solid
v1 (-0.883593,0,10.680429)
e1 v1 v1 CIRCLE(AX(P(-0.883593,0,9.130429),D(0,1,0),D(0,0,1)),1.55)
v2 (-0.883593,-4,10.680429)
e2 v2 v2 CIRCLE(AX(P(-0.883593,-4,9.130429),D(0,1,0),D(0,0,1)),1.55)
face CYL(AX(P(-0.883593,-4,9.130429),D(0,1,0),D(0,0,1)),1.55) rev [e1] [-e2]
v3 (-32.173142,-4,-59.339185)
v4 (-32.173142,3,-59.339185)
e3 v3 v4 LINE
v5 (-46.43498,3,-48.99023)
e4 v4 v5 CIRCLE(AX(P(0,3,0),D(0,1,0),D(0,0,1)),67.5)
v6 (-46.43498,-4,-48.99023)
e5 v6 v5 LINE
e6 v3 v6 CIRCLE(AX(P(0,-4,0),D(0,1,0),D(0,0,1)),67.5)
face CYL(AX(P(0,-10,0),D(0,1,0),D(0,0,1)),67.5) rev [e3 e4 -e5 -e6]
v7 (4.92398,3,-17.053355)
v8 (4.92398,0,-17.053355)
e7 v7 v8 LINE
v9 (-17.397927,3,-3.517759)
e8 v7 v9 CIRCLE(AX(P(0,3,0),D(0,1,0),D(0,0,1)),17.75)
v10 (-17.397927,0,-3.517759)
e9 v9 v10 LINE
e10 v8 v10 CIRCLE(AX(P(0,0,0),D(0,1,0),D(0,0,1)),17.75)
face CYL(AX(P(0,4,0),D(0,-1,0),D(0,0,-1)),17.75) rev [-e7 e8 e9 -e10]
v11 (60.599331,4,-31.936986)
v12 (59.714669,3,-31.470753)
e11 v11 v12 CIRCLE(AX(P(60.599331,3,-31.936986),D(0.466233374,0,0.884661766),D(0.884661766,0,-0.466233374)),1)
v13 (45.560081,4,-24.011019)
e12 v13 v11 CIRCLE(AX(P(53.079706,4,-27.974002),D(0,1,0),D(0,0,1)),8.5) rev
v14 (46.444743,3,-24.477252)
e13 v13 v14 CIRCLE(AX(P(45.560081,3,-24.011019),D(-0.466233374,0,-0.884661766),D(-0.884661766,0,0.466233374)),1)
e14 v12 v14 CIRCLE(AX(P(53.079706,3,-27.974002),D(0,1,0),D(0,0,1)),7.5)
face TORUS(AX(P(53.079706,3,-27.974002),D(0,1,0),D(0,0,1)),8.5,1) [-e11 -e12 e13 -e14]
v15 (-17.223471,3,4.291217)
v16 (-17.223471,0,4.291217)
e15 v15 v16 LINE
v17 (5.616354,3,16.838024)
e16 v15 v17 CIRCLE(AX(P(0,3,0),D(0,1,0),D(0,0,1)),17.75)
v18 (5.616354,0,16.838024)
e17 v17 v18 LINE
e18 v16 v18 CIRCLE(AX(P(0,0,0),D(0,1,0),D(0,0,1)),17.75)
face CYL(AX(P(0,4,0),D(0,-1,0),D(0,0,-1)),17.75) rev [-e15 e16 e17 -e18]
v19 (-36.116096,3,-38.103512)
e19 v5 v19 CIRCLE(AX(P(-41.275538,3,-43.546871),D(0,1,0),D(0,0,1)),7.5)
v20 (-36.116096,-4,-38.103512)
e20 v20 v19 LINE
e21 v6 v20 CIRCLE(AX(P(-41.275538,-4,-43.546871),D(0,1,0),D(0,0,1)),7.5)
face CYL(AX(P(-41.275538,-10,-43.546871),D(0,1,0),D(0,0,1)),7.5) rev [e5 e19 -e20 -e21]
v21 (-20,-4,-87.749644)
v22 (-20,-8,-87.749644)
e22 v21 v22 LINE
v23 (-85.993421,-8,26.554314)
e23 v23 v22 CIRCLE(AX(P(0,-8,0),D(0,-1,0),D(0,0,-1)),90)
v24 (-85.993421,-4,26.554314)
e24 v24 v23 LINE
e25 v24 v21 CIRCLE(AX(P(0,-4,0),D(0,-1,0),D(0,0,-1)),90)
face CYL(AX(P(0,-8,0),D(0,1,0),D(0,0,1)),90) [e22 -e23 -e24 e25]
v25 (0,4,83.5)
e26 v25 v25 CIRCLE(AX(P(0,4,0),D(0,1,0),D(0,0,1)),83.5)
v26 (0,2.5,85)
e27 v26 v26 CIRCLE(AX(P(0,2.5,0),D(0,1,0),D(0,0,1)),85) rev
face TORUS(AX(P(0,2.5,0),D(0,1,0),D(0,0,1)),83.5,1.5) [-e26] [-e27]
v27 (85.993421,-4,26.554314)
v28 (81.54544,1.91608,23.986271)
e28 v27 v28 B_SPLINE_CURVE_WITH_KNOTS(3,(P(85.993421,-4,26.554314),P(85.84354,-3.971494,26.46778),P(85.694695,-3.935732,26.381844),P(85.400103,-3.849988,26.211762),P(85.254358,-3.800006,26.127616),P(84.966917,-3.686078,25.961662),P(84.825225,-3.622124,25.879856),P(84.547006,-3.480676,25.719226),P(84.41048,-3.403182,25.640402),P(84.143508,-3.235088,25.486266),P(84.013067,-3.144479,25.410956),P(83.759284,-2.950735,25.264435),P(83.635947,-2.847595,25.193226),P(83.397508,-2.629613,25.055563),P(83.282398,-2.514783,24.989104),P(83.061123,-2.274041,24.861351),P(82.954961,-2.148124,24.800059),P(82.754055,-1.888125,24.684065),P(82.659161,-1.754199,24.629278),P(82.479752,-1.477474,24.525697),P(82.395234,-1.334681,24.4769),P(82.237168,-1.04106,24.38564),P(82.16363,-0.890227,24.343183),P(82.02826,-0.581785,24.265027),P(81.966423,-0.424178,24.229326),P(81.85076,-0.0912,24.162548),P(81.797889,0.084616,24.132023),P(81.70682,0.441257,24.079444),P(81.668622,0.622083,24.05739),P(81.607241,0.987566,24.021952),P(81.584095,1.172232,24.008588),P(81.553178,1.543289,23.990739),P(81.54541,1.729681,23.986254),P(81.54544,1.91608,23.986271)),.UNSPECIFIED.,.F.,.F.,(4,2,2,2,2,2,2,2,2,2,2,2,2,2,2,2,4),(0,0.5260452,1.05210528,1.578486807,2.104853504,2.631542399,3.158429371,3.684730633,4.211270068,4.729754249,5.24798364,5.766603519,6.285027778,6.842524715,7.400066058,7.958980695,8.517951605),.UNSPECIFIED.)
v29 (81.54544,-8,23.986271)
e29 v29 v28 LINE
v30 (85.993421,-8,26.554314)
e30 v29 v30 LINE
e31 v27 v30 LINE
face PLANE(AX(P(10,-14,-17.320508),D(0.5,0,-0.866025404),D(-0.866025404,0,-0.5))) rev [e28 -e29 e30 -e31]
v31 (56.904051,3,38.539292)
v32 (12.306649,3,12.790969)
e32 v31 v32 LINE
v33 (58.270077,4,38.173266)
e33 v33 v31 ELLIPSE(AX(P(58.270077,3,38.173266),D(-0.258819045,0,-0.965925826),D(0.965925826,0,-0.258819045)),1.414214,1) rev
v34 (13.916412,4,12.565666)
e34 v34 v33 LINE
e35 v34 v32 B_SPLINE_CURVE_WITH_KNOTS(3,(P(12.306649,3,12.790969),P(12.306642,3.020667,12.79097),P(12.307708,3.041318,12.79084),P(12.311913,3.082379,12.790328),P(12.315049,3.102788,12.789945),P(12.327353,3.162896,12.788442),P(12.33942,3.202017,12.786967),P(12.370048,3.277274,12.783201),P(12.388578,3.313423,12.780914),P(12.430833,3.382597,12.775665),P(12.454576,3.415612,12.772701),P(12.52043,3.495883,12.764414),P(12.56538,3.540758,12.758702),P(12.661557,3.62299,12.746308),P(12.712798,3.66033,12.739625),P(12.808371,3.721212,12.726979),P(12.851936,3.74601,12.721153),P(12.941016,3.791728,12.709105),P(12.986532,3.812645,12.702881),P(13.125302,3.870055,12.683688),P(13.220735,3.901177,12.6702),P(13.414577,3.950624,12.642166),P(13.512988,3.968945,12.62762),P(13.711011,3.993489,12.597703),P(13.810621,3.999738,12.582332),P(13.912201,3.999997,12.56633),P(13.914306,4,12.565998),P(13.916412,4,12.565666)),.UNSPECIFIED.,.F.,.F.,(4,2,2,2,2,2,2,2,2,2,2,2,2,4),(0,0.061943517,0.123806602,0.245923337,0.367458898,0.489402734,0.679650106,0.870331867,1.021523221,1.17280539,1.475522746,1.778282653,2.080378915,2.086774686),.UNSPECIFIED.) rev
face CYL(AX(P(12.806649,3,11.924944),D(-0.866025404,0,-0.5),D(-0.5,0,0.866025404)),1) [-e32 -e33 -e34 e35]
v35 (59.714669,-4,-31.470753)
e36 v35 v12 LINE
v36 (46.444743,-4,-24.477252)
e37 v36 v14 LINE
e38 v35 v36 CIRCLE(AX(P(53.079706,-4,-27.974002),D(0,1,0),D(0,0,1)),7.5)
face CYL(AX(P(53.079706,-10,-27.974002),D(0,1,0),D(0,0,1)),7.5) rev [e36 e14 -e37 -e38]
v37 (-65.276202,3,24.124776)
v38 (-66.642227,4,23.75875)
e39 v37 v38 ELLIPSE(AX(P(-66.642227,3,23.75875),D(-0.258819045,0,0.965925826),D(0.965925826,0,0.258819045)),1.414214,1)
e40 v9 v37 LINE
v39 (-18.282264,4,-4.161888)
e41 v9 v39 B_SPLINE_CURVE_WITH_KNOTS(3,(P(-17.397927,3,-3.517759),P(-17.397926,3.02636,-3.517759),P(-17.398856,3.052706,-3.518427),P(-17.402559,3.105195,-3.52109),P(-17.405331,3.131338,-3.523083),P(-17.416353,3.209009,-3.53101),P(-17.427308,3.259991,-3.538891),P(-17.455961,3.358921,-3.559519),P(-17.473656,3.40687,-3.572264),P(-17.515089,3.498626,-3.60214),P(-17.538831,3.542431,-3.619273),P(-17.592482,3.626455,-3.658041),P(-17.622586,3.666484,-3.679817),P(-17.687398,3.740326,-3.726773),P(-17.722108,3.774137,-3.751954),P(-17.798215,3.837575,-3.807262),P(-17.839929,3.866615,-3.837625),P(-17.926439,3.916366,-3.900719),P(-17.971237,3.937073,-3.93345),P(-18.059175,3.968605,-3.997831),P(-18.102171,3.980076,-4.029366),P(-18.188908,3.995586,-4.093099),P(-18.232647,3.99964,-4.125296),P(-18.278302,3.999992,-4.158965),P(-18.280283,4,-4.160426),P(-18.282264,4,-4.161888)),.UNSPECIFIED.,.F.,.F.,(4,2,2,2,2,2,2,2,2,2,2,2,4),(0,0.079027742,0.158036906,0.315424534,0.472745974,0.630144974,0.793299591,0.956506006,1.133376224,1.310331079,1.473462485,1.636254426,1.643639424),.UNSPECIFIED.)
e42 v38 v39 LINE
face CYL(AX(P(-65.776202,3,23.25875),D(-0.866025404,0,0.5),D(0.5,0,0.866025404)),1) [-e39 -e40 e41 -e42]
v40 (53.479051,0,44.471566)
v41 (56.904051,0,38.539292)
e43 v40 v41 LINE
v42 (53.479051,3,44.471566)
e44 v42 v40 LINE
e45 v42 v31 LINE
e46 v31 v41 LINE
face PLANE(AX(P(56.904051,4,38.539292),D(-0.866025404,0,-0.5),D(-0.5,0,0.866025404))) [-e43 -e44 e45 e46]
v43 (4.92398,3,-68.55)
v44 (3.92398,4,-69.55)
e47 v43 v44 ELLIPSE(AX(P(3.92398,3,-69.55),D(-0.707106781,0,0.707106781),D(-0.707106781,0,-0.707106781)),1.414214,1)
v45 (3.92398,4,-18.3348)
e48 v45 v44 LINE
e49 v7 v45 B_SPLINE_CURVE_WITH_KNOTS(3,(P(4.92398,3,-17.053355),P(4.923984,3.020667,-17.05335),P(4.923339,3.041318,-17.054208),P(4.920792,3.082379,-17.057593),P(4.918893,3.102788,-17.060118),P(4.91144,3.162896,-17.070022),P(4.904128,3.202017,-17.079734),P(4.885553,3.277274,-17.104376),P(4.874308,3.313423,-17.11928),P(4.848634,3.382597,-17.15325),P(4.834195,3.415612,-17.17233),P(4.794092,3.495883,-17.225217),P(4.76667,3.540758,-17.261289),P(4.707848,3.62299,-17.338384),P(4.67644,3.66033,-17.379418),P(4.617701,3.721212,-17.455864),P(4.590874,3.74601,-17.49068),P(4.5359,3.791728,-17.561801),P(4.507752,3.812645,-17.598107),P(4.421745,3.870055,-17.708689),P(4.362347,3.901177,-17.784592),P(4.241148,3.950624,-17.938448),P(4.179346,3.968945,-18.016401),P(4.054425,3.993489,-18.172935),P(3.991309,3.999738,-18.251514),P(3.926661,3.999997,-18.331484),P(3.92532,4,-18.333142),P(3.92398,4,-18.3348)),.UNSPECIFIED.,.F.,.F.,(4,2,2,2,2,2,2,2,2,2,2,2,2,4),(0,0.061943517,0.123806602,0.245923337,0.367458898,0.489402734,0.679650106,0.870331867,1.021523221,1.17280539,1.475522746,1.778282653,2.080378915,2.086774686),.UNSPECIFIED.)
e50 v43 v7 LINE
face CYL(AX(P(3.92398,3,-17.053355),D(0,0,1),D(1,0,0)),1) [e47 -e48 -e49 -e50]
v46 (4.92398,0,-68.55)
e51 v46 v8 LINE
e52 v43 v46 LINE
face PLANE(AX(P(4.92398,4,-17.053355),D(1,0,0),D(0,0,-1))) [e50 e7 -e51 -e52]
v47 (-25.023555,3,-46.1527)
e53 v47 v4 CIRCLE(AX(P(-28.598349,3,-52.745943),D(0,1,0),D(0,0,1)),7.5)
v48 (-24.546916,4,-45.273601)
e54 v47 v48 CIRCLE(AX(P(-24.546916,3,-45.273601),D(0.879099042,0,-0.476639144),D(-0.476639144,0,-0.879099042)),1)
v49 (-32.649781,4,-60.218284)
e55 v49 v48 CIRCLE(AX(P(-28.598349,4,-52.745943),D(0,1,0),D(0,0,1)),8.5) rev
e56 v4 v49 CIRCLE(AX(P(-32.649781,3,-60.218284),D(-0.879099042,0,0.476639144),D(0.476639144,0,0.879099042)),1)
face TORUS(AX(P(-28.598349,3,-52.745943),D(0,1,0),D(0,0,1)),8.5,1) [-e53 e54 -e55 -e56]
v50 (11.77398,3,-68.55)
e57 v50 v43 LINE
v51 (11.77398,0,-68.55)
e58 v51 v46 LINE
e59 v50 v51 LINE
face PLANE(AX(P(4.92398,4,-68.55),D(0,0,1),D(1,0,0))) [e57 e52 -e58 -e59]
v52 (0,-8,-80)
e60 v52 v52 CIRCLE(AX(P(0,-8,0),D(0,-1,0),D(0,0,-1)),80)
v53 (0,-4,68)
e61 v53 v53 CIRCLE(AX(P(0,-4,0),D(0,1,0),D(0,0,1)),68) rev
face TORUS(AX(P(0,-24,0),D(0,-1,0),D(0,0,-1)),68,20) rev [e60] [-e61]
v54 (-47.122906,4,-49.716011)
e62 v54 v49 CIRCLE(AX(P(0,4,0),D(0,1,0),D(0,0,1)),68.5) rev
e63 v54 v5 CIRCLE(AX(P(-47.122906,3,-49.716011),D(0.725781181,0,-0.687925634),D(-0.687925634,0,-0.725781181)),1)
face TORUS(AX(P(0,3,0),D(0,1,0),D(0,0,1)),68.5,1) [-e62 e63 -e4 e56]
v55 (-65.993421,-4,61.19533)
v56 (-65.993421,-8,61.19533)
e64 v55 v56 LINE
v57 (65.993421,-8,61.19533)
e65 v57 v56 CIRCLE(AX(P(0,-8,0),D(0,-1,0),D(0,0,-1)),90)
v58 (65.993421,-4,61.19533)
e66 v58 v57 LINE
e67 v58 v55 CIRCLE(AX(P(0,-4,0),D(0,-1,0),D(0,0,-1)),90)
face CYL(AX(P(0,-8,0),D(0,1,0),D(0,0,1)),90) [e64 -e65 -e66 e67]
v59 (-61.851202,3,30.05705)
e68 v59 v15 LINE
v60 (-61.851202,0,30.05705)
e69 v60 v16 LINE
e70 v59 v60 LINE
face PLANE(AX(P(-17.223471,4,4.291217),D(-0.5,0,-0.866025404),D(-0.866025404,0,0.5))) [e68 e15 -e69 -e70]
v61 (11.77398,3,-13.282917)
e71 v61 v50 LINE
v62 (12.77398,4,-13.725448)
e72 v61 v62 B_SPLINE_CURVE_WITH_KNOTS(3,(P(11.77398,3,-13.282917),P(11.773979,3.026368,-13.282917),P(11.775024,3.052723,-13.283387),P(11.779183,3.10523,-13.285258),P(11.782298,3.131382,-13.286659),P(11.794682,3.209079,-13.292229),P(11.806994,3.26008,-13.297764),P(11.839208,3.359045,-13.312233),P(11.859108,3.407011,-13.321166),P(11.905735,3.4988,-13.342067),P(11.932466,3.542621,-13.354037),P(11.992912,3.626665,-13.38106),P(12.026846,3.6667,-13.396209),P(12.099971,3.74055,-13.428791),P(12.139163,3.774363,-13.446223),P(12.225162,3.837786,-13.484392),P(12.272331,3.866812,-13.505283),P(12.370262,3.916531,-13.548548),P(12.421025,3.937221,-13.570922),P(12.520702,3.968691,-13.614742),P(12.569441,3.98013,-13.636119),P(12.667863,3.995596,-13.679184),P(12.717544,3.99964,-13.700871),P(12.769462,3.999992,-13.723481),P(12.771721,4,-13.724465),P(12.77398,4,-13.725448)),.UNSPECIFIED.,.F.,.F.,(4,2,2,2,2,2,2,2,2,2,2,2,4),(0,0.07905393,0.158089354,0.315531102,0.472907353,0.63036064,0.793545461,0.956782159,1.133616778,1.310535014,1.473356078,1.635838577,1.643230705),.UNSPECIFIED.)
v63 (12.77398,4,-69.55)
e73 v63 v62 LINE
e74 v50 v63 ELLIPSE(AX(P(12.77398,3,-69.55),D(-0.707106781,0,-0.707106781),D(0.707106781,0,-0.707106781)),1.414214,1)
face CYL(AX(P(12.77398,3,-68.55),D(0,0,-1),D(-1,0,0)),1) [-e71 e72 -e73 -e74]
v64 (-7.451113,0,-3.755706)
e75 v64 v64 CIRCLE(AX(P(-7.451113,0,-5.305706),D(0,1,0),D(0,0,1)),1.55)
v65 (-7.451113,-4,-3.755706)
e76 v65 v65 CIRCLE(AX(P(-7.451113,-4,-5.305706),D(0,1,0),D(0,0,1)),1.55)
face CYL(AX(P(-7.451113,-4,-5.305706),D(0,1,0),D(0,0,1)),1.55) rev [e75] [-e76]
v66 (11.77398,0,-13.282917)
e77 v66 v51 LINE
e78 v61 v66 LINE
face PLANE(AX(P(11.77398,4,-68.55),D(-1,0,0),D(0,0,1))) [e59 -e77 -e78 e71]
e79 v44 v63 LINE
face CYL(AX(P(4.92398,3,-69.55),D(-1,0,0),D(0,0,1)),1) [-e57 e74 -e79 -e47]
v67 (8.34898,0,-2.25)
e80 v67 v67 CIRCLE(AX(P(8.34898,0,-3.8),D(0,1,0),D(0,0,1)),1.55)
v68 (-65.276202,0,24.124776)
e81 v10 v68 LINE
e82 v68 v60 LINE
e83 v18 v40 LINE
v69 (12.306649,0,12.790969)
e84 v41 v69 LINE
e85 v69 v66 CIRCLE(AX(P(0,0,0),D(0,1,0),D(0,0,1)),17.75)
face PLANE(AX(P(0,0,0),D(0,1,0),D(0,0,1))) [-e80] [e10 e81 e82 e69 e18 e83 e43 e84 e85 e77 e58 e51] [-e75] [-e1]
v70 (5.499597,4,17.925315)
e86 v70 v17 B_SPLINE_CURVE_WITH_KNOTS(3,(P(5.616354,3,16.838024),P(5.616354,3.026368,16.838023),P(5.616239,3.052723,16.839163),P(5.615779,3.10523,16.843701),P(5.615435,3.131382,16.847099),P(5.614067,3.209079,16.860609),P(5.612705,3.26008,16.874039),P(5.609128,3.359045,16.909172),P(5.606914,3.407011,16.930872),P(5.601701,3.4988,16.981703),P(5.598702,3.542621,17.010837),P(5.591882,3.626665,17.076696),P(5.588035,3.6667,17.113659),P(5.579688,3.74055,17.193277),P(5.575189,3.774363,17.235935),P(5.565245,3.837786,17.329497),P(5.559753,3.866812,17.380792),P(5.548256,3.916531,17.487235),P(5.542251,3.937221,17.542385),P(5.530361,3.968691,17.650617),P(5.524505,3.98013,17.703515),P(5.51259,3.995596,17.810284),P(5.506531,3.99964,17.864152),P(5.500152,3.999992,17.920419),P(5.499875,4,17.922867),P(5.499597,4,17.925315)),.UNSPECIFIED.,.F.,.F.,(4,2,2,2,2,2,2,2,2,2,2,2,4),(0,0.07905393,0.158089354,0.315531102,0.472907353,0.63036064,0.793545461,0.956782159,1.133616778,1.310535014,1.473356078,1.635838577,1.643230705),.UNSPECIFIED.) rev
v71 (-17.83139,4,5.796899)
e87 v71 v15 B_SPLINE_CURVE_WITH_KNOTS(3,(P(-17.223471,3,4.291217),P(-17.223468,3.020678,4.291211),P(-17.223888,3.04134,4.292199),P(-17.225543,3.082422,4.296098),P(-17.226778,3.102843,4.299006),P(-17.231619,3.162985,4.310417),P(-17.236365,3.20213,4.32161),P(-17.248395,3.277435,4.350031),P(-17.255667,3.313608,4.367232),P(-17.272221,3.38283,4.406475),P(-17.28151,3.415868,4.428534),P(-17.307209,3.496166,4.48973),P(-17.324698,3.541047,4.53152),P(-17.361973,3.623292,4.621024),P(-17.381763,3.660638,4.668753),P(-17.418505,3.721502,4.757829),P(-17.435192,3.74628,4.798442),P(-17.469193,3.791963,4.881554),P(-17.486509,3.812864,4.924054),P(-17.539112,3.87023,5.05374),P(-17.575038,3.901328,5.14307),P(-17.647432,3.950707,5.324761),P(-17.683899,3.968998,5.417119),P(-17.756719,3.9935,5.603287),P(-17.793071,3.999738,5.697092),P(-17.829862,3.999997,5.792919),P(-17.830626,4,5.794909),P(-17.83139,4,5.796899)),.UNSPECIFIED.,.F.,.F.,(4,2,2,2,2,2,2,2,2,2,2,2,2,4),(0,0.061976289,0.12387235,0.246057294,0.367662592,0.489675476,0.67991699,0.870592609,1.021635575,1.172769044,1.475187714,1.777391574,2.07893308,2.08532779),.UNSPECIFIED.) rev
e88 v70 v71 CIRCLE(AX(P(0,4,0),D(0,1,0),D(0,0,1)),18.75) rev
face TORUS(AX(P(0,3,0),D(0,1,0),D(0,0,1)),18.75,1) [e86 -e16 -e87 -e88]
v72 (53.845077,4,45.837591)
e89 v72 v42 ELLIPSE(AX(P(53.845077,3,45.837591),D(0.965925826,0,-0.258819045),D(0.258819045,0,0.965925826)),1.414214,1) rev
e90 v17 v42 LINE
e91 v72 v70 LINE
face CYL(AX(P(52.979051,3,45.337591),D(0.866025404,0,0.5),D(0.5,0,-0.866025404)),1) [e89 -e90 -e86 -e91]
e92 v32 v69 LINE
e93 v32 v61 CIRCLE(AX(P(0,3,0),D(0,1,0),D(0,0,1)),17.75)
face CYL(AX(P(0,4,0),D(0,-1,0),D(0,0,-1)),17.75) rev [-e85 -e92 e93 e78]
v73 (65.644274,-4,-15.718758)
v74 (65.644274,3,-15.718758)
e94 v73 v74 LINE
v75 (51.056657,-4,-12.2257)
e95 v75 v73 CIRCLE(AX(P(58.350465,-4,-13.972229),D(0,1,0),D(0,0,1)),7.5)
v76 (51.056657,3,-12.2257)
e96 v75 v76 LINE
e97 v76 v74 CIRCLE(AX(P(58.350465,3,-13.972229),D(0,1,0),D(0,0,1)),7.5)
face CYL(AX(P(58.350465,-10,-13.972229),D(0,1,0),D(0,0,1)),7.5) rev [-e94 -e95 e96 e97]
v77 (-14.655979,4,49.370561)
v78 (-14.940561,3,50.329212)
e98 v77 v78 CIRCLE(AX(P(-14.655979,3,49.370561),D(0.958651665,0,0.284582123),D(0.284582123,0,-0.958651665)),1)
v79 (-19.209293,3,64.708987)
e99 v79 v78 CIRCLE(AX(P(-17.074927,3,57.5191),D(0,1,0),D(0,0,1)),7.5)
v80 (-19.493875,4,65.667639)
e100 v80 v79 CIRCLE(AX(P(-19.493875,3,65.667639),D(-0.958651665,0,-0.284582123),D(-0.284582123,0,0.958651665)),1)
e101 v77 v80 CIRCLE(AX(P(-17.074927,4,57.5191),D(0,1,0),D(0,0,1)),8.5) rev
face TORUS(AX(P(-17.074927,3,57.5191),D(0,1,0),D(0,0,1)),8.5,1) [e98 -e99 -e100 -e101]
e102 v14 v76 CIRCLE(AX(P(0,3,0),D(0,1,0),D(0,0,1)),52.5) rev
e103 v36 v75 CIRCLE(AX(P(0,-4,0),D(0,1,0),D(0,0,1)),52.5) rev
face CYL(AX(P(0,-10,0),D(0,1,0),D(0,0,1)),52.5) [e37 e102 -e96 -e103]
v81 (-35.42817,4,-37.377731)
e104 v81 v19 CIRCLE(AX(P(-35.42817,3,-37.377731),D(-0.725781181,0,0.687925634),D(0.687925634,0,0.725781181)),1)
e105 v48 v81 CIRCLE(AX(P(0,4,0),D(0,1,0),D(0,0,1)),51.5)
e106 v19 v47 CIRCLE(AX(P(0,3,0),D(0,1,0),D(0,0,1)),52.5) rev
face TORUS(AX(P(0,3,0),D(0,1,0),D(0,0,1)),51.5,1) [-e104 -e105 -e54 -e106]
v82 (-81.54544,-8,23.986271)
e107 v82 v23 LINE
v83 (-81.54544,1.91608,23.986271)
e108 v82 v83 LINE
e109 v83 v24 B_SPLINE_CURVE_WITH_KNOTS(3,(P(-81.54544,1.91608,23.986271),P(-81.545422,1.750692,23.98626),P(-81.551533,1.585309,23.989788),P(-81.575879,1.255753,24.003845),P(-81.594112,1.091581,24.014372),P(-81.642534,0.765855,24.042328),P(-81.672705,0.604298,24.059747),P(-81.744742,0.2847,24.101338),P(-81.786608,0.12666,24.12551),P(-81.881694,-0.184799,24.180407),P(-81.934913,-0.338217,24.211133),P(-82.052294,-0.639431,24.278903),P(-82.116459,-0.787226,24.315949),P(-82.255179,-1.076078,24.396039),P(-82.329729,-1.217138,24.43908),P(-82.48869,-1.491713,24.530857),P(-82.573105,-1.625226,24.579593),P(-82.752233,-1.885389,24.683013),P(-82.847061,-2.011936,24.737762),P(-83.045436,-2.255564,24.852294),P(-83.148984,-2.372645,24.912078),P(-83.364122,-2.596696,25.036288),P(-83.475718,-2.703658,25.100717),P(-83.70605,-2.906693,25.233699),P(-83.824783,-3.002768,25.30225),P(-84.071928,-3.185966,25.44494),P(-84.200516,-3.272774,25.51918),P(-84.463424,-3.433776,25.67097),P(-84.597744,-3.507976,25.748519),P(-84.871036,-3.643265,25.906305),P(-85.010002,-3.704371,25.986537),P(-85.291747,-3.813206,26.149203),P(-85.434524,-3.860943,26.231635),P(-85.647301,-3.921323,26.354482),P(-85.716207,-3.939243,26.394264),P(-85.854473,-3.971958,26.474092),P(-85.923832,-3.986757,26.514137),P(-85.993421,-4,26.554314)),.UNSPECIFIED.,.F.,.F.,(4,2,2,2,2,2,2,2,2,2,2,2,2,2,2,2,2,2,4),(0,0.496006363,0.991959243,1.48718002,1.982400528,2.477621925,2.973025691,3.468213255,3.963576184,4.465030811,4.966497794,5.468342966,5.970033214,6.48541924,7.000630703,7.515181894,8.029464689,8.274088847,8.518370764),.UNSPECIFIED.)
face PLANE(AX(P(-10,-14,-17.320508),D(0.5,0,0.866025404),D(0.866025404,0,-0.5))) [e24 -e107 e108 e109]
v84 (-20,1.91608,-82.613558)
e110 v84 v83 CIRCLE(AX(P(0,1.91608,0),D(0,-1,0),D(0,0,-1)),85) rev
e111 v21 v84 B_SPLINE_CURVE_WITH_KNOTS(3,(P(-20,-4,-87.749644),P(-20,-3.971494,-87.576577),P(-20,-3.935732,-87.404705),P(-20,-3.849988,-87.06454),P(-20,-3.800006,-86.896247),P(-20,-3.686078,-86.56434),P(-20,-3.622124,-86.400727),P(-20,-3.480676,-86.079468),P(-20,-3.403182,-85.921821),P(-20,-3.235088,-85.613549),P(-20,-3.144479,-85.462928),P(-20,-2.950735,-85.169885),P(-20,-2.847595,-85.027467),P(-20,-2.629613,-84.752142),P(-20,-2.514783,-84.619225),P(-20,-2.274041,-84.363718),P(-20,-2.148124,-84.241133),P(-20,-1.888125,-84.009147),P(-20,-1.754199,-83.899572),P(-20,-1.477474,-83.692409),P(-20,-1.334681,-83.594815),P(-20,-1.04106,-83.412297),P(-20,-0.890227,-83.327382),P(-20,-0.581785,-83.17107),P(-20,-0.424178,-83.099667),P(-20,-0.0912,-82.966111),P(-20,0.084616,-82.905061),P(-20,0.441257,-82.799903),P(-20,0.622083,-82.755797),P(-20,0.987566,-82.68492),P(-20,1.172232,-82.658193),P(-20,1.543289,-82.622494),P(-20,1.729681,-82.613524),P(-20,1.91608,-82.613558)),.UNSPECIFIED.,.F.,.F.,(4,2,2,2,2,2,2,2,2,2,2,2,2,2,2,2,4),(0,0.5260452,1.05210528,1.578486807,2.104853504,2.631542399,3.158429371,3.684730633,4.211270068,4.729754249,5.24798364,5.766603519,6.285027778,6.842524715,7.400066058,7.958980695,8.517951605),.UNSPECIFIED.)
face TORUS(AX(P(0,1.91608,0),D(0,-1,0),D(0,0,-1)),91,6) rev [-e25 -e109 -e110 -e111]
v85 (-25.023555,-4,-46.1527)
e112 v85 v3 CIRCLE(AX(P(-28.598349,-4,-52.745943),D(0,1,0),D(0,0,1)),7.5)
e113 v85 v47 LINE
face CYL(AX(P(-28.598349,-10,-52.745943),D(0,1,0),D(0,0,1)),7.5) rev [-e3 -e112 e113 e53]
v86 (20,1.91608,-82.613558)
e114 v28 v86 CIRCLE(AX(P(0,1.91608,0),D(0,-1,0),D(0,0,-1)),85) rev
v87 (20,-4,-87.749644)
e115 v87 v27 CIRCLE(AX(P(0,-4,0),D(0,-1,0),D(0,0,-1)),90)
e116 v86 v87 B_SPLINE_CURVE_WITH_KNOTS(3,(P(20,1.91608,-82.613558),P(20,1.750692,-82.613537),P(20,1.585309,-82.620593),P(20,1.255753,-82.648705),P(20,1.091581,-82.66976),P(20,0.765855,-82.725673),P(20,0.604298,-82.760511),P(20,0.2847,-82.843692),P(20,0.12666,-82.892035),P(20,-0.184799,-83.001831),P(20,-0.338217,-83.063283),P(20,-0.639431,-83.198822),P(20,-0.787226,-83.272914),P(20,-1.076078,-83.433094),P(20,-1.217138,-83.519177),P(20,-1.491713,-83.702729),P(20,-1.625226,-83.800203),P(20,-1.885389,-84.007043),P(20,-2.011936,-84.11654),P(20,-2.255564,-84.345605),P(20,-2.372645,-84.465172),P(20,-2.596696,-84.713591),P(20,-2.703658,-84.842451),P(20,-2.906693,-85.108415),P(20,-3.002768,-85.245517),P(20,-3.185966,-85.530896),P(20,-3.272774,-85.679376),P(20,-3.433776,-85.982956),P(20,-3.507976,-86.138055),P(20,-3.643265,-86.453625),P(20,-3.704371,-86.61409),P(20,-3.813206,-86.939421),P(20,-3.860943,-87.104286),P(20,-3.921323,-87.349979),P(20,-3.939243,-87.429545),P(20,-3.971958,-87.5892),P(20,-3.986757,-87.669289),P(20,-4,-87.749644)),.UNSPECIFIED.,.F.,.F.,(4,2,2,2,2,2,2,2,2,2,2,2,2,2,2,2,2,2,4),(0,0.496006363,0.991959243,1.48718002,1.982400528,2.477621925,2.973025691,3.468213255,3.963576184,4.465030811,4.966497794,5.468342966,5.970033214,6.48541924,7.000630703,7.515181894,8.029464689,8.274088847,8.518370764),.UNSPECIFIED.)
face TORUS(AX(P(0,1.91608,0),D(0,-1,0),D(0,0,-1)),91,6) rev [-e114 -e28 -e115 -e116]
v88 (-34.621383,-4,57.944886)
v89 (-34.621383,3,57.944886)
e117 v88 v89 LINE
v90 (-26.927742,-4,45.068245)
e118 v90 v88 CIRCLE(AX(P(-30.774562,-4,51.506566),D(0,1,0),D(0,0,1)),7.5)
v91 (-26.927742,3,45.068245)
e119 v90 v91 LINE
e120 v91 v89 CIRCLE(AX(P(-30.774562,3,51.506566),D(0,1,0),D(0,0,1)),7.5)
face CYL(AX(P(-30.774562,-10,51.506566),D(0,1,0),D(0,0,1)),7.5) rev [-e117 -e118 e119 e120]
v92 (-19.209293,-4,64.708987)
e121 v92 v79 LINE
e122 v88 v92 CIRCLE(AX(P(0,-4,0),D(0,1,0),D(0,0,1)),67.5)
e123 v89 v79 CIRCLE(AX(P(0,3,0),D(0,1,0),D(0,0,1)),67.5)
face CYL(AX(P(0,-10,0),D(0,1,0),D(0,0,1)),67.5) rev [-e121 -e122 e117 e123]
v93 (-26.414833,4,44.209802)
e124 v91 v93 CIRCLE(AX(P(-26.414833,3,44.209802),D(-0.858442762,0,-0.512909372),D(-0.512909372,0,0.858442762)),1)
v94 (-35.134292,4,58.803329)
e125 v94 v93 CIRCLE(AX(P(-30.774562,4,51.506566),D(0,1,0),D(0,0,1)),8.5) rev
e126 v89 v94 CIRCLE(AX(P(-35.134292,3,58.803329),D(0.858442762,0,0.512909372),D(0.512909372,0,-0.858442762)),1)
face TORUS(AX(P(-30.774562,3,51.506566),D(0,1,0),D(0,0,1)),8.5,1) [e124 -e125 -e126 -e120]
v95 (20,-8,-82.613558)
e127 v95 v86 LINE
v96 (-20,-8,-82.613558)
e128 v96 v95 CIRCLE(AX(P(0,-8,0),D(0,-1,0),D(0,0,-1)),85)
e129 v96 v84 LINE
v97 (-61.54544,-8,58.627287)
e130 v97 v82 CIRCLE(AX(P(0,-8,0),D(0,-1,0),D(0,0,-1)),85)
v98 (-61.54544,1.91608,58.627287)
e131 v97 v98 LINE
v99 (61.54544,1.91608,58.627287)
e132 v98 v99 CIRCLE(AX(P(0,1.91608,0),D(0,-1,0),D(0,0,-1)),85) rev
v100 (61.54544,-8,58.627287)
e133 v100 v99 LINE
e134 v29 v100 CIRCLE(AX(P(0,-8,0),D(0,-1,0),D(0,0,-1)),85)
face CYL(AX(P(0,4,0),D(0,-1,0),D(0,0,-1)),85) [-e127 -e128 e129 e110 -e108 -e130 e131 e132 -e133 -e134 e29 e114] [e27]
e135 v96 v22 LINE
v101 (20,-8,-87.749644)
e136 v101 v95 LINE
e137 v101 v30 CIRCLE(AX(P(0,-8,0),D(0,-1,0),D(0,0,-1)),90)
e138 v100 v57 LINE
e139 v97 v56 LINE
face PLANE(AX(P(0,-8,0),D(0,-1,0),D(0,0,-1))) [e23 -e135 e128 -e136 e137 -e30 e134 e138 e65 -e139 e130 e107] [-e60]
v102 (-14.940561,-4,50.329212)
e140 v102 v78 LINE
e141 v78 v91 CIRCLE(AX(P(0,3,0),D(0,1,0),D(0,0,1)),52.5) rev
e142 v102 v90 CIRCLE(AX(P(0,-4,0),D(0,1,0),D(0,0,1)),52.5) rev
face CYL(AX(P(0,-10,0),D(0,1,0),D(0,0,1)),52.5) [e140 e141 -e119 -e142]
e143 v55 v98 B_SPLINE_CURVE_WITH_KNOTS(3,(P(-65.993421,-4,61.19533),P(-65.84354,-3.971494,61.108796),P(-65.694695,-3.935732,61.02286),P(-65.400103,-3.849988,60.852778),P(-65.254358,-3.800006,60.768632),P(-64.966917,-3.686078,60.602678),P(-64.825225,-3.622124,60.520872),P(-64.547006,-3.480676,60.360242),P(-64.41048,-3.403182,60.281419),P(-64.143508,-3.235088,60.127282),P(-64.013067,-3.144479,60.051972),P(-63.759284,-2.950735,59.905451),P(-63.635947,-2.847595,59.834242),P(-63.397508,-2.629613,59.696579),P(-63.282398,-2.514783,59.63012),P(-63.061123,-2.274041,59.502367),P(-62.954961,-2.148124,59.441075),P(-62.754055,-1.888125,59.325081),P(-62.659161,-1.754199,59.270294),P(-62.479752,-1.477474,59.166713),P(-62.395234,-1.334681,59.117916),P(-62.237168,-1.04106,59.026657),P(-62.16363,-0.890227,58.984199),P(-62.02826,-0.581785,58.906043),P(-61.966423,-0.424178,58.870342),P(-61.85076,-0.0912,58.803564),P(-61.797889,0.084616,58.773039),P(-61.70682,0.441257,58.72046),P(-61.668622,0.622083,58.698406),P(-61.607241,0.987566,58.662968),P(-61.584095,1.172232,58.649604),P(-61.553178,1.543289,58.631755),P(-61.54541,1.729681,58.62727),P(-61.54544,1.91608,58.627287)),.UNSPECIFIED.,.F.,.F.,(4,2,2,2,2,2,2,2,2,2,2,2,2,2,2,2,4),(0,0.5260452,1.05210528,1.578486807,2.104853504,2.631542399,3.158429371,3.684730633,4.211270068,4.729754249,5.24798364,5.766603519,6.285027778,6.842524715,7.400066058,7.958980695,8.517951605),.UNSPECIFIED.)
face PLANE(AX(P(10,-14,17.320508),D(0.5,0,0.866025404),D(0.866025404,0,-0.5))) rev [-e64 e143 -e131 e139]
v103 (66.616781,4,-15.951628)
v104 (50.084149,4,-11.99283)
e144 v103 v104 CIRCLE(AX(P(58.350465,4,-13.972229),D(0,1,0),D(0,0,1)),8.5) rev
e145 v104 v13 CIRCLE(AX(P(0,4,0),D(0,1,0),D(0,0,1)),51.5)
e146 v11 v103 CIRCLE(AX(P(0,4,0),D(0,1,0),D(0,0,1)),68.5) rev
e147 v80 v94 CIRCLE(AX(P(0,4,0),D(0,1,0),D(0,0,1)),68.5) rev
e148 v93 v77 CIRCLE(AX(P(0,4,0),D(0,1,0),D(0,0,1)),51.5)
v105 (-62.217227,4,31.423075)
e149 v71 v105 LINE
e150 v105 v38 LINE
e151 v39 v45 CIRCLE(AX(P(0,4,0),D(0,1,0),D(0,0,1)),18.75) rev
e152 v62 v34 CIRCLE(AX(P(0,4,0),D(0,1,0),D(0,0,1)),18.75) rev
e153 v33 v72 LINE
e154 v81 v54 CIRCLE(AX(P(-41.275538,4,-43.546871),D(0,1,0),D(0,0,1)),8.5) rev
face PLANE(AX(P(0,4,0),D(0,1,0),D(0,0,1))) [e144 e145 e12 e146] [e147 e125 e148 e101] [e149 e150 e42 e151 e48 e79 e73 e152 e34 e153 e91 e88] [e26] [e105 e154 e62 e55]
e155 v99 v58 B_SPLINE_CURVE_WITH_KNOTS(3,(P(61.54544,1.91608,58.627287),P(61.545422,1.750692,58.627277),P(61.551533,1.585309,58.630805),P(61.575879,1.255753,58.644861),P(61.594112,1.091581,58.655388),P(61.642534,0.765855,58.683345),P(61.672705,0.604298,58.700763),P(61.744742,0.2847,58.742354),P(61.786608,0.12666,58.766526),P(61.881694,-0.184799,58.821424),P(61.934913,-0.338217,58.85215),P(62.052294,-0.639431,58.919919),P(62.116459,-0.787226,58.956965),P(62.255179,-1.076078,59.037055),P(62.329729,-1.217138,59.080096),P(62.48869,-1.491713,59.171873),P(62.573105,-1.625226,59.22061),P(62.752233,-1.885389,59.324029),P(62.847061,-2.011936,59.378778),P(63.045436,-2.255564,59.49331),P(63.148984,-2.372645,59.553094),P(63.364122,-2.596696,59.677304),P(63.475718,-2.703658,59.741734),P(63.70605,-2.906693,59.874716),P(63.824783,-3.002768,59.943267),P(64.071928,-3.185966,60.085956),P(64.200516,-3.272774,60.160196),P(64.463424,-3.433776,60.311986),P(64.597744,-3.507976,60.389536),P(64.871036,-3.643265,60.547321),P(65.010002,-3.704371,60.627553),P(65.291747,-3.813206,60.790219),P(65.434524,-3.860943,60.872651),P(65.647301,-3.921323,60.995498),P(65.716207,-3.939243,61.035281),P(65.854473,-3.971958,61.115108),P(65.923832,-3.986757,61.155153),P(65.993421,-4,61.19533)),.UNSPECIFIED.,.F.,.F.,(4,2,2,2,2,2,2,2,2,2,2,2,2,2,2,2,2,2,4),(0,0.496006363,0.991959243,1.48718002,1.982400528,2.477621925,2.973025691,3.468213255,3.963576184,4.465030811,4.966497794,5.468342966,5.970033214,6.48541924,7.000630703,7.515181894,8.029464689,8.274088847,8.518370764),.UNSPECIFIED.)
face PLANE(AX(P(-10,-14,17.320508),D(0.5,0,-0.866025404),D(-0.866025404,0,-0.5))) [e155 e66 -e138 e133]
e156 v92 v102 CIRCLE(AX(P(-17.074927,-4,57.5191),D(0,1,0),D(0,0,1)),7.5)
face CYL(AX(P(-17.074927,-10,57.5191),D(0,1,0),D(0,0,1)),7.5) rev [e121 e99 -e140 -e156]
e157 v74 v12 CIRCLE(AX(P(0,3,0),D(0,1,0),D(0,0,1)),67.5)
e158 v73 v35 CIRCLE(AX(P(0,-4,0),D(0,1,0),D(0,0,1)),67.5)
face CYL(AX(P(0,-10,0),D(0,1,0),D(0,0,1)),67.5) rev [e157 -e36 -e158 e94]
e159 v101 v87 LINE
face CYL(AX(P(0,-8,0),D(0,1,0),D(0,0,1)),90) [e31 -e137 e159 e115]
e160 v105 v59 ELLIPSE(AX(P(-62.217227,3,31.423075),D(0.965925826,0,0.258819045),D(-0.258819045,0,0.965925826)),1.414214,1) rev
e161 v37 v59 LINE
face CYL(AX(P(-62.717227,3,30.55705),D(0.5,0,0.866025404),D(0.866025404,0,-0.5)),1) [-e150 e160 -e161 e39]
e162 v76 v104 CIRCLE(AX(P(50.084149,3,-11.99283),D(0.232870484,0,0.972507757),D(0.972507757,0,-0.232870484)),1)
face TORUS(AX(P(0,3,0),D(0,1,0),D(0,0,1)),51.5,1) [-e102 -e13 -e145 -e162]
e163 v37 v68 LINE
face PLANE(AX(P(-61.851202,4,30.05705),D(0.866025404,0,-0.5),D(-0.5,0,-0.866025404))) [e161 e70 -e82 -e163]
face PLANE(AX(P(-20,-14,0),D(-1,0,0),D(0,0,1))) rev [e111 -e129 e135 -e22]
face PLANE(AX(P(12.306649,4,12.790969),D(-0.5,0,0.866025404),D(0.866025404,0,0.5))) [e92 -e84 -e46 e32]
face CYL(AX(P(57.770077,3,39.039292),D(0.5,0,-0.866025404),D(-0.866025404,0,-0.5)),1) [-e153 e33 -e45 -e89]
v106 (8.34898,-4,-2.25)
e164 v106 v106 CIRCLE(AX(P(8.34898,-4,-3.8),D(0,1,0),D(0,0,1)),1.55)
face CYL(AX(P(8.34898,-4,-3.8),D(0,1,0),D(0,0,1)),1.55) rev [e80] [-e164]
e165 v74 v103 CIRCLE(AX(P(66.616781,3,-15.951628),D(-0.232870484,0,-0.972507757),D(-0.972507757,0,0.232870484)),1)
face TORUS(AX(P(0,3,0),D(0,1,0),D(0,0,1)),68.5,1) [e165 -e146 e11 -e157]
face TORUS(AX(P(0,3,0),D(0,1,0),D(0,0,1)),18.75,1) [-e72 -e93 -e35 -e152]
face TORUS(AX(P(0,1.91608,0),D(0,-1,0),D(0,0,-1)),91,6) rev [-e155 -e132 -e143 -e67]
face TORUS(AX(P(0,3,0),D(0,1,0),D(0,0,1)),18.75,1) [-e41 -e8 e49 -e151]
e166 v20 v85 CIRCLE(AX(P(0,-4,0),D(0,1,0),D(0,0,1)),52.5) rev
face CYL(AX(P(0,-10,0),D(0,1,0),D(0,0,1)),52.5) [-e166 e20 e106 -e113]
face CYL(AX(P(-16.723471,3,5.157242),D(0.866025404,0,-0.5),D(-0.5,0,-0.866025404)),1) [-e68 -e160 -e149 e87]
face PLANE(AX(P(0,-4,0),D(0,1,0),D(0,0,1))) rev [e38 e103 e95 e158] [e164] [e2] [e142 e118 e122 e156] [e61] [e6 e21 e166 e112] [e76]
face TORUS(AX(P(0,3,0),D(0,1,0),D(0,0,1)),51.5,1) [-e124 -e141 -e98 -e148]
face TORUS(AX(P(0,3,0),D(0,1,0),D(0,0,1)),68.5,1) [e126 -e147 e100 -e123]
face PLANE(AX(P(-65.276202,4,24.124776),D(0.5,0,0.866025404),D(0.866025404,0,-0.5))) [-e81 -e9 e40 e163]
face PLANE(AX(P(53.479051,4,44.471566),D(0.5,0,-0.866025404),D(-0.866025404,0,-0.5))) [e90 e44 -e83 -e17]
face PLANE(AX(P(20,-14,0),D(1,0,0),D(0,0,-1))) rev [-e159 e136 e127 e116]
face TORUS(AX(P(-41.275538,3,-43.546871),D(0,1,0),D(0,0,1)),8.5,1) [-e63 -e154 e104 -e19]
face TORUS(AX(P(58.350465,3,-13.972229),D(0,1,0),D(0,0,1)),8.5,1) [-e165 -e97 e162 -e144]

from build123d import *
from build123d.topology import SkipClean

# Parameters (mm, degrees)
CROQUIS2_R              = 85
SALIENTE_EXTRUIR1_DEPTH = 4
SALIENTE_EXTRUIR2_START = -4
CROQUIS3_R              = 85
SALIENTE_EXTRUIR2_DEPTH = 4
CROQUIS4_R              = 1.55
CORTAR_EXTRUIR2_DEPTH   = 4
CROQUIS5_R              = 90
CROQUIS5_R_2            = 80
SALIENTE_EXTRUIR3_DEPTH = 4
REDONDEO1_R             = 20
CORTAR_EXTRUIR3_DEPTH   = 14
CORTAR_EXTRUIR4_DEPTH   = 14
REDONDEO2_R             = 6
REDONDEO3_R             = 1.5
REDONDEO5_R             = 1


with BuildPart() as part:
    # Croquis2 → Saliente-Extruir1 (new body)
    with BuildSketch(Plane(origin=(0, 0, 0), x_dir=(1, 0, 0), z_dir=(0, 1, 0))):
        with Locations(Location((0, 0, 0), (0, 0, 270))):
            Circle(CROQUIS2_R)
        with BuildLine():
            Line((-65.276202, -24.124776), (-17.397927, 3.517759))
            ThreePointArc((-17.397927, 3.517759), (-9.203419, 15.177601), (4.92398, 17.053355))
            Line((4.92398, 17.053355), (4.92398, 68.55))
            Line((4.92398, 68.55), (11.77398, 68.55))
            Line((11.77398, 68.55), (11.77398, 13.282917))
            ThreePointArc((11.77398, 13.282917), (17.746297, 0.362543), (12.306649, -12.790969))
            Line((12.306649, -12.790969), (56.904051, -38.539292))
            Line((56.904051, -38.539292), (53.479051, -44.471566))
            Line((53.479051, -44.471566), (5.616354, -16.838024))
            ThreePointArc((5.616354, -16.838024), (-8.546162, -15.557172), (-17.223471, -4.291217))
            Line((-17.223471, -4.291217), (-61.851202, -30.05705))
            Line((-61.851202, -30.05705), (-65.276202, -24.124776))
        make_face(mode=Mode.SUBTRACT)
    extrude(amount=SALIENTE_EXTRUIR1_DEPTH)

    # Croquis3 → Saliente-Extruir2 (add)
    with BuildSketch(Plane(origin=(0, 0, 0), x_dir=(1, 0, 0), z_dir=(0, 1, 0)).offset(SALIENTE_EXTRUIR2_START)):
        with Locations(Location((0, 0, 0), (0, 0, 270))):
            Circle(CROQUIS3_R)
    extrude(amount=SALIENTE_EXTRUIR2_DEPTH)

    # Croquis4 → Cortar-Extruir2 (cut)
    with BuildSketch(Plane(origin=(0, 0, 0), x_dir=(1, 0, 0), z_dir=(0, 1, 0))):
        with Locations(Location((-7.451113, 5.305706, 0), (0, 0, 270))):
            Circle(CROQUIS4_R)
        with Locations(Location((8.34898, 3.8, 0), (0, 0, 270))):
            Circle(CROQUIS4_R)
        with Locations(Location((-0.883593, -9.130429, 0), (0, 0, 270))):
            Circle(CROQUIS4_R)
    extrude(amount=-CORTAR_EXTRUIR2_DEPTH, mode=Mode.SUBTRACT)

    # Croquis5 → Saliente-Extruir3 (add)
    with BuildSketch(Plane.XZ.offset(4)):
        with Locations(Location((0, 0, 0), (0, 0, 270))):
            Circle(CROQUIS5_R)
        with Locations(Location((0, 0, 0), (0, 0, 270))):
            Circle(CROQUIS5_R_2, mode=Mode.SUBTRACT)
    extrude(amount=SALIENTE_EXTRUIR3_DEPTH)

    # Redondeo1
    # the kernel refuses this fillet: 20 mm, written as the material it adds along each edge
    with BuildSketch(Plane(origin=(0, -4, 0), x_dir=(0, 0, -1), z_dir=(-1, 0, 0))) as redondeo1_piece_1:
        with BuildLine():
            CenterArc((68, 20), REDONDEO1_R, 270, 36.869898)
            Line((68, 0), (68, -0.4))
            Line((68, -0.4), (80, -0.4))
            Line((80, -0.4), (80.4, 0))
            ThreePointArc((80.4, 0), (80.4, 2), (80.24, 3.68))
            Line((80.24, 3.68), (80, 4))
        make_face()
    revolve(axis=Axis((0, -4, 0), (0, -1, 0)))

    # Croquis6 → Cortar-Extruir3 (cut)
    with BuildSketch(Plane(origin=(0, 4, 0), x_dir=(1, 0, 0), z_dir=(0, 1, 0))):
        with BuildLine():
            ThreePointArc((65.644274, 15.718758), (63.172363, 23.780297), (59.714669, 31.470753))
            ThreePointArc((59.714669, 31.470753), (49.582956, 34.608966), (46.444743, 24.477252))
            ThreePointArc((46.444743, 24.477252), (49.13406, 18.495787), (51.056657, 12.2257))
            ThreePointArc((51.056657, 12.2257), (60.096994, 6.678421), (65.644274, 15.718758))
        make_face()
        with BuildLine():
            ThreePointArc((-34.621383, -57.944886), (-27.126992, -61.809193), (-19.209293, -64.708987))
            ThreePointArc((-19.209293, -64.708987), (-9.88504, -59.653466), (-14.940561, -50.329212))
            ThreePointArc((-14.940561, -50.329212), (-21.098771, -48.073817), (-26.927742, -45.068245))
            ThreePointArc((-26.927742, -45.068245), (-37.212883, -47.659745), (-34.621383, -57.944886))
        make_face()
        with BuildLine():
            ThreePointArc((-32.173142, 59.339185), (-39.643214, 54.632093), (-46.43498, 48.99023))
            ThreePointArc((-46.43498, 48.99023), (-46.718897, 38.387429), (-36.116096, 38.103512))
            ThreePointArc((-36.116096, 38.103512), (-30.833611, 42.491628), (-25.023555, 46.1527))
            ThreePointArc((-25.023555, 46.1527), (-22.005106, 56.320736), (-32.173142, 59.339185))
        make_face()
    extrude(amount=-CORTAR_EXTRUIR3_DEPTH, mode=Mode.SUBTRACT)

    # Croquis7 → Cortar-Extruir4 (cut)
    with SkipClean():  # the faces are left unmerged after this step: merging them gives an invalid solid
        with BuildSketch(Plane(origin=(0, 0, 0), x_dir=(1, 0, 0), z_dir=(0, 1, 0))):
            with BuildLine():
                ThreePointArc((20, 87.749644), (0, 90), (-20, 87.749644))
                Line((-20, 87.749644), (-20, 82.613558))
                ThreePointArc((-20, 82.613558), (0, 85), (20, 82.613558))
                Line((20, 82.613558), (20, 87.749644))
            make_face()
            with BuildLine():
                Line((-81.54544, -23.986271), (-85.993421, -26.554314))
                ThreePointArc((-85.993421, -26.554314), (-77.942286, -45), (-65.993421, -61.19533))
                Line((-65.993421, -61.19533), (-61.54544, -58.627287))
                ThreePointArc((-61.54544, -58.627287), (-73.612159, -42.5), (-81.54544, -23.986271))
            make_face()
            with BuildLine():
                Line((61.54544, -58.627287), (65.993421, -61.19533))
                ThreePointArc((65.993421, -61.19533), (77.942286, -45), (85.993421, -26.554314))
                Line((85.993421, -26.554314), (81.54544, -23.986271))
                ThreePointArc((81.54544, -23.986271), (73.612159, -42.5), (61.54544, -58.627287))
            make_face()
        extrude(amount=-CORTAR_EXTRUIR4_DEPTH, mode=Mode.SUBTRACT)

    # Redondeo2
    # the kernel refuses this fillet: 6 mm, written as the material it adds along each edge
    with BuildSketch(Plane(origin=(0, -4, 0), x_dir=(0, 0, 1), z_dir=(-1, 0, 0))) as redondeo2_piece_1_section:
        with BuildLine():
            CenterArc((91, 5.91608), REDONDEO2_R, 180, 80.405932)
            Line((85, 5.91608), (85, 0))
            Line((85, 0), (90, 0))
        make_face()
    redondeo2_piece_1 = revolve(axis=Axis((0, -4, 0), (0, 1, 0)), revolution_arc=56.361703, mode=Mode.PRIVATE)
    redondeo2_piece_1 = split(redondeo2_piece_1, bisect_by=Plane(origin=(50.216265, -1.96465, 52.086385), z_dir=(-0.5000000000000014, 0, 0.8660254037844379)), keep=Keep.TOP, mode=Mode.PRIVATE)
    add(redondeo2_piece_1)
    with BuildSketch(Plane(origin=(0, -4, 0), x_dir=(-0.06340198221663615, 0, -0.9979880703951332), z_dir=(0.9979880703951332, 0, -0.06340198221663615))) as redondeo2_piece_2_section:
        with BuildLine():
            CenterArc((91, 5.91608), REDONDEO2_R, 180, 80.405932)
            Line((85, 5.91608), (85, 0))
            Line((85, 0), (90, 0))
        make_face()
    redondeo2_piece_2 = revolve(axis=Axis((0, -4, 0), (0, 1, 0)), revolution_arc=112.729792, mode=Mode.PRIVATE)
    redondeo2_piece_2 = split(redondeo2_piece_2, bisect_by=Plane(origin=(-20, -1.96465, -43.20413), z_dir=(-1, 0, 0)), keep=Keep.TOP, mode=Mode.PRIVATE)
    redondeo2_piece_2 = split(redondeo2_piece_2, bisect_by=Plane(origin=(-47.415874, -1.96465, 4.281557), z_dir=(-0.5000000000000031, 0, -0.8660254037844368)), keep=Keep.TOP, mode=Mode.PRIVATE)
    add(redondeo2_piece_2)
    with BuildSketch(Plane(origin=(0, -4, 0), x_dir=(0.8959840127443035, 0, 0.4440863079476957), z_dir=(-0.4440863079476957, 0, 0.8959840127443035))) as redondeo2_piece_3_section:
        with BuildLine():
            CenterArc((91, 5.91608), REDONDEO2_R, 180, 80.405932)
            Line((85, 5.91608), (85, 0))
            Line((85, 0), (90, 0))
        make_face()
    redondeo2_piece_3 = revolve(axis=Axis((0, -4, 0), (0, 1, 0)), revolution_arc=112.729792, mode=Mode.PRIVATE)
    redondeo2_piece_3 = split(redondeo2_piece_3, bisect_by=Plane(origin=(20, -1.96465, -43.20413), z_dir=(1, 0, 0)), keep=Keep.TOP, mode=Mode.PRIVATE)
    redondeo2_piece_3 = split(redondeo2_piece_3, bisect_by=Plane(origin=(47.415874, -1.96465, 4.281557), z_dir=(0.5000000000000029, 0, -0.866025403784437)), keep=Keep.TOP, mode=Mode.PRIVATE)
    add(redondeo2_piece_3)
    with BuildSketch(Plane(origin=(0, -4, 0), x_dir=(-0.8325511658864714, 0, 0.553948152971988), z_dir=(-0.553948152971988, 0, -0.8325511658864714))) as redondeo2_piece_4_section:
        with BuildLine():
            CenterArc((91, 5.91608), REDONDEO2_R, 180, 80.405932)
            Line((85, 5.91608), (85, 0))
            Line((85, 0), (90, 0))
        make_face()
    redondeo2_piece_4 = revolve(axis=Axis((0, -4, 0), (0, 1, 0)), revolution_arc=56.361703, mode=Mode.PRIVATE)
    redondeo2_piece_4 = split(redondeo2_piece_4, bisect_by=Plane(origin=(-50.216265, -1.96465, 52.086385), z_dir=(0.5000000000000049, 0, 0.8660254037844358)), keep=Keep.TOP, mode=Mode.PRIVATE)
    add(redondeo2_piece_4)

    # Redondeo3
    redondeo3_edges = [part.edges().sort_by_distance(p)[0] for p in [
        (0, 4, -85),
    ]]
    fillet(redondeo3_edges, radius=REDONDEO3_R)

    # Redondeo5
    redondeo5_edges = [part.edges().sort_by_distance(p)[0] for p in [
        (-37.212883, 4, 47.659745),
        (-27.126992, 4, 61.809193),
        (-9.88504, 4, 59.653466),
        (-21.098771, 4, 48.073817),
        (-22.005106, 4, -56.320736),
        (-39.643214, 4, -54.632093),
        (-46.718897, 4, -38.387429),
        (-30.833611, 4, -42.491628),
        (-9.203419, 4, -15.177601),
        (-41.337065, 4, 10.303508),
        (-63.563702, 4, 27.090913),
        (-39.537337, 4, 17.174133),
        (-8.546162, 4, 15.557172),
        (29.547703, 4, 30.654795),
        (55.191551, 4, 41.505429),
        (34.60535, 4, 25.665131),
        (17.746297, 4, -0.362543),
        (11.77398, 4, -40.916459),
        (8.34898, 4, -68.55),
        (4.92398, 4, -42.801678),
        (60.096994, 4, -6.678421),
        (63.172363, 4, -23.780297),
        (49.582956, 4, -34.608966),
        (49.13406, 4, -18.495787),
    ]]
    fillet(redondeo5_edges, radius=REDONDEO5_R)


solid = part.part
